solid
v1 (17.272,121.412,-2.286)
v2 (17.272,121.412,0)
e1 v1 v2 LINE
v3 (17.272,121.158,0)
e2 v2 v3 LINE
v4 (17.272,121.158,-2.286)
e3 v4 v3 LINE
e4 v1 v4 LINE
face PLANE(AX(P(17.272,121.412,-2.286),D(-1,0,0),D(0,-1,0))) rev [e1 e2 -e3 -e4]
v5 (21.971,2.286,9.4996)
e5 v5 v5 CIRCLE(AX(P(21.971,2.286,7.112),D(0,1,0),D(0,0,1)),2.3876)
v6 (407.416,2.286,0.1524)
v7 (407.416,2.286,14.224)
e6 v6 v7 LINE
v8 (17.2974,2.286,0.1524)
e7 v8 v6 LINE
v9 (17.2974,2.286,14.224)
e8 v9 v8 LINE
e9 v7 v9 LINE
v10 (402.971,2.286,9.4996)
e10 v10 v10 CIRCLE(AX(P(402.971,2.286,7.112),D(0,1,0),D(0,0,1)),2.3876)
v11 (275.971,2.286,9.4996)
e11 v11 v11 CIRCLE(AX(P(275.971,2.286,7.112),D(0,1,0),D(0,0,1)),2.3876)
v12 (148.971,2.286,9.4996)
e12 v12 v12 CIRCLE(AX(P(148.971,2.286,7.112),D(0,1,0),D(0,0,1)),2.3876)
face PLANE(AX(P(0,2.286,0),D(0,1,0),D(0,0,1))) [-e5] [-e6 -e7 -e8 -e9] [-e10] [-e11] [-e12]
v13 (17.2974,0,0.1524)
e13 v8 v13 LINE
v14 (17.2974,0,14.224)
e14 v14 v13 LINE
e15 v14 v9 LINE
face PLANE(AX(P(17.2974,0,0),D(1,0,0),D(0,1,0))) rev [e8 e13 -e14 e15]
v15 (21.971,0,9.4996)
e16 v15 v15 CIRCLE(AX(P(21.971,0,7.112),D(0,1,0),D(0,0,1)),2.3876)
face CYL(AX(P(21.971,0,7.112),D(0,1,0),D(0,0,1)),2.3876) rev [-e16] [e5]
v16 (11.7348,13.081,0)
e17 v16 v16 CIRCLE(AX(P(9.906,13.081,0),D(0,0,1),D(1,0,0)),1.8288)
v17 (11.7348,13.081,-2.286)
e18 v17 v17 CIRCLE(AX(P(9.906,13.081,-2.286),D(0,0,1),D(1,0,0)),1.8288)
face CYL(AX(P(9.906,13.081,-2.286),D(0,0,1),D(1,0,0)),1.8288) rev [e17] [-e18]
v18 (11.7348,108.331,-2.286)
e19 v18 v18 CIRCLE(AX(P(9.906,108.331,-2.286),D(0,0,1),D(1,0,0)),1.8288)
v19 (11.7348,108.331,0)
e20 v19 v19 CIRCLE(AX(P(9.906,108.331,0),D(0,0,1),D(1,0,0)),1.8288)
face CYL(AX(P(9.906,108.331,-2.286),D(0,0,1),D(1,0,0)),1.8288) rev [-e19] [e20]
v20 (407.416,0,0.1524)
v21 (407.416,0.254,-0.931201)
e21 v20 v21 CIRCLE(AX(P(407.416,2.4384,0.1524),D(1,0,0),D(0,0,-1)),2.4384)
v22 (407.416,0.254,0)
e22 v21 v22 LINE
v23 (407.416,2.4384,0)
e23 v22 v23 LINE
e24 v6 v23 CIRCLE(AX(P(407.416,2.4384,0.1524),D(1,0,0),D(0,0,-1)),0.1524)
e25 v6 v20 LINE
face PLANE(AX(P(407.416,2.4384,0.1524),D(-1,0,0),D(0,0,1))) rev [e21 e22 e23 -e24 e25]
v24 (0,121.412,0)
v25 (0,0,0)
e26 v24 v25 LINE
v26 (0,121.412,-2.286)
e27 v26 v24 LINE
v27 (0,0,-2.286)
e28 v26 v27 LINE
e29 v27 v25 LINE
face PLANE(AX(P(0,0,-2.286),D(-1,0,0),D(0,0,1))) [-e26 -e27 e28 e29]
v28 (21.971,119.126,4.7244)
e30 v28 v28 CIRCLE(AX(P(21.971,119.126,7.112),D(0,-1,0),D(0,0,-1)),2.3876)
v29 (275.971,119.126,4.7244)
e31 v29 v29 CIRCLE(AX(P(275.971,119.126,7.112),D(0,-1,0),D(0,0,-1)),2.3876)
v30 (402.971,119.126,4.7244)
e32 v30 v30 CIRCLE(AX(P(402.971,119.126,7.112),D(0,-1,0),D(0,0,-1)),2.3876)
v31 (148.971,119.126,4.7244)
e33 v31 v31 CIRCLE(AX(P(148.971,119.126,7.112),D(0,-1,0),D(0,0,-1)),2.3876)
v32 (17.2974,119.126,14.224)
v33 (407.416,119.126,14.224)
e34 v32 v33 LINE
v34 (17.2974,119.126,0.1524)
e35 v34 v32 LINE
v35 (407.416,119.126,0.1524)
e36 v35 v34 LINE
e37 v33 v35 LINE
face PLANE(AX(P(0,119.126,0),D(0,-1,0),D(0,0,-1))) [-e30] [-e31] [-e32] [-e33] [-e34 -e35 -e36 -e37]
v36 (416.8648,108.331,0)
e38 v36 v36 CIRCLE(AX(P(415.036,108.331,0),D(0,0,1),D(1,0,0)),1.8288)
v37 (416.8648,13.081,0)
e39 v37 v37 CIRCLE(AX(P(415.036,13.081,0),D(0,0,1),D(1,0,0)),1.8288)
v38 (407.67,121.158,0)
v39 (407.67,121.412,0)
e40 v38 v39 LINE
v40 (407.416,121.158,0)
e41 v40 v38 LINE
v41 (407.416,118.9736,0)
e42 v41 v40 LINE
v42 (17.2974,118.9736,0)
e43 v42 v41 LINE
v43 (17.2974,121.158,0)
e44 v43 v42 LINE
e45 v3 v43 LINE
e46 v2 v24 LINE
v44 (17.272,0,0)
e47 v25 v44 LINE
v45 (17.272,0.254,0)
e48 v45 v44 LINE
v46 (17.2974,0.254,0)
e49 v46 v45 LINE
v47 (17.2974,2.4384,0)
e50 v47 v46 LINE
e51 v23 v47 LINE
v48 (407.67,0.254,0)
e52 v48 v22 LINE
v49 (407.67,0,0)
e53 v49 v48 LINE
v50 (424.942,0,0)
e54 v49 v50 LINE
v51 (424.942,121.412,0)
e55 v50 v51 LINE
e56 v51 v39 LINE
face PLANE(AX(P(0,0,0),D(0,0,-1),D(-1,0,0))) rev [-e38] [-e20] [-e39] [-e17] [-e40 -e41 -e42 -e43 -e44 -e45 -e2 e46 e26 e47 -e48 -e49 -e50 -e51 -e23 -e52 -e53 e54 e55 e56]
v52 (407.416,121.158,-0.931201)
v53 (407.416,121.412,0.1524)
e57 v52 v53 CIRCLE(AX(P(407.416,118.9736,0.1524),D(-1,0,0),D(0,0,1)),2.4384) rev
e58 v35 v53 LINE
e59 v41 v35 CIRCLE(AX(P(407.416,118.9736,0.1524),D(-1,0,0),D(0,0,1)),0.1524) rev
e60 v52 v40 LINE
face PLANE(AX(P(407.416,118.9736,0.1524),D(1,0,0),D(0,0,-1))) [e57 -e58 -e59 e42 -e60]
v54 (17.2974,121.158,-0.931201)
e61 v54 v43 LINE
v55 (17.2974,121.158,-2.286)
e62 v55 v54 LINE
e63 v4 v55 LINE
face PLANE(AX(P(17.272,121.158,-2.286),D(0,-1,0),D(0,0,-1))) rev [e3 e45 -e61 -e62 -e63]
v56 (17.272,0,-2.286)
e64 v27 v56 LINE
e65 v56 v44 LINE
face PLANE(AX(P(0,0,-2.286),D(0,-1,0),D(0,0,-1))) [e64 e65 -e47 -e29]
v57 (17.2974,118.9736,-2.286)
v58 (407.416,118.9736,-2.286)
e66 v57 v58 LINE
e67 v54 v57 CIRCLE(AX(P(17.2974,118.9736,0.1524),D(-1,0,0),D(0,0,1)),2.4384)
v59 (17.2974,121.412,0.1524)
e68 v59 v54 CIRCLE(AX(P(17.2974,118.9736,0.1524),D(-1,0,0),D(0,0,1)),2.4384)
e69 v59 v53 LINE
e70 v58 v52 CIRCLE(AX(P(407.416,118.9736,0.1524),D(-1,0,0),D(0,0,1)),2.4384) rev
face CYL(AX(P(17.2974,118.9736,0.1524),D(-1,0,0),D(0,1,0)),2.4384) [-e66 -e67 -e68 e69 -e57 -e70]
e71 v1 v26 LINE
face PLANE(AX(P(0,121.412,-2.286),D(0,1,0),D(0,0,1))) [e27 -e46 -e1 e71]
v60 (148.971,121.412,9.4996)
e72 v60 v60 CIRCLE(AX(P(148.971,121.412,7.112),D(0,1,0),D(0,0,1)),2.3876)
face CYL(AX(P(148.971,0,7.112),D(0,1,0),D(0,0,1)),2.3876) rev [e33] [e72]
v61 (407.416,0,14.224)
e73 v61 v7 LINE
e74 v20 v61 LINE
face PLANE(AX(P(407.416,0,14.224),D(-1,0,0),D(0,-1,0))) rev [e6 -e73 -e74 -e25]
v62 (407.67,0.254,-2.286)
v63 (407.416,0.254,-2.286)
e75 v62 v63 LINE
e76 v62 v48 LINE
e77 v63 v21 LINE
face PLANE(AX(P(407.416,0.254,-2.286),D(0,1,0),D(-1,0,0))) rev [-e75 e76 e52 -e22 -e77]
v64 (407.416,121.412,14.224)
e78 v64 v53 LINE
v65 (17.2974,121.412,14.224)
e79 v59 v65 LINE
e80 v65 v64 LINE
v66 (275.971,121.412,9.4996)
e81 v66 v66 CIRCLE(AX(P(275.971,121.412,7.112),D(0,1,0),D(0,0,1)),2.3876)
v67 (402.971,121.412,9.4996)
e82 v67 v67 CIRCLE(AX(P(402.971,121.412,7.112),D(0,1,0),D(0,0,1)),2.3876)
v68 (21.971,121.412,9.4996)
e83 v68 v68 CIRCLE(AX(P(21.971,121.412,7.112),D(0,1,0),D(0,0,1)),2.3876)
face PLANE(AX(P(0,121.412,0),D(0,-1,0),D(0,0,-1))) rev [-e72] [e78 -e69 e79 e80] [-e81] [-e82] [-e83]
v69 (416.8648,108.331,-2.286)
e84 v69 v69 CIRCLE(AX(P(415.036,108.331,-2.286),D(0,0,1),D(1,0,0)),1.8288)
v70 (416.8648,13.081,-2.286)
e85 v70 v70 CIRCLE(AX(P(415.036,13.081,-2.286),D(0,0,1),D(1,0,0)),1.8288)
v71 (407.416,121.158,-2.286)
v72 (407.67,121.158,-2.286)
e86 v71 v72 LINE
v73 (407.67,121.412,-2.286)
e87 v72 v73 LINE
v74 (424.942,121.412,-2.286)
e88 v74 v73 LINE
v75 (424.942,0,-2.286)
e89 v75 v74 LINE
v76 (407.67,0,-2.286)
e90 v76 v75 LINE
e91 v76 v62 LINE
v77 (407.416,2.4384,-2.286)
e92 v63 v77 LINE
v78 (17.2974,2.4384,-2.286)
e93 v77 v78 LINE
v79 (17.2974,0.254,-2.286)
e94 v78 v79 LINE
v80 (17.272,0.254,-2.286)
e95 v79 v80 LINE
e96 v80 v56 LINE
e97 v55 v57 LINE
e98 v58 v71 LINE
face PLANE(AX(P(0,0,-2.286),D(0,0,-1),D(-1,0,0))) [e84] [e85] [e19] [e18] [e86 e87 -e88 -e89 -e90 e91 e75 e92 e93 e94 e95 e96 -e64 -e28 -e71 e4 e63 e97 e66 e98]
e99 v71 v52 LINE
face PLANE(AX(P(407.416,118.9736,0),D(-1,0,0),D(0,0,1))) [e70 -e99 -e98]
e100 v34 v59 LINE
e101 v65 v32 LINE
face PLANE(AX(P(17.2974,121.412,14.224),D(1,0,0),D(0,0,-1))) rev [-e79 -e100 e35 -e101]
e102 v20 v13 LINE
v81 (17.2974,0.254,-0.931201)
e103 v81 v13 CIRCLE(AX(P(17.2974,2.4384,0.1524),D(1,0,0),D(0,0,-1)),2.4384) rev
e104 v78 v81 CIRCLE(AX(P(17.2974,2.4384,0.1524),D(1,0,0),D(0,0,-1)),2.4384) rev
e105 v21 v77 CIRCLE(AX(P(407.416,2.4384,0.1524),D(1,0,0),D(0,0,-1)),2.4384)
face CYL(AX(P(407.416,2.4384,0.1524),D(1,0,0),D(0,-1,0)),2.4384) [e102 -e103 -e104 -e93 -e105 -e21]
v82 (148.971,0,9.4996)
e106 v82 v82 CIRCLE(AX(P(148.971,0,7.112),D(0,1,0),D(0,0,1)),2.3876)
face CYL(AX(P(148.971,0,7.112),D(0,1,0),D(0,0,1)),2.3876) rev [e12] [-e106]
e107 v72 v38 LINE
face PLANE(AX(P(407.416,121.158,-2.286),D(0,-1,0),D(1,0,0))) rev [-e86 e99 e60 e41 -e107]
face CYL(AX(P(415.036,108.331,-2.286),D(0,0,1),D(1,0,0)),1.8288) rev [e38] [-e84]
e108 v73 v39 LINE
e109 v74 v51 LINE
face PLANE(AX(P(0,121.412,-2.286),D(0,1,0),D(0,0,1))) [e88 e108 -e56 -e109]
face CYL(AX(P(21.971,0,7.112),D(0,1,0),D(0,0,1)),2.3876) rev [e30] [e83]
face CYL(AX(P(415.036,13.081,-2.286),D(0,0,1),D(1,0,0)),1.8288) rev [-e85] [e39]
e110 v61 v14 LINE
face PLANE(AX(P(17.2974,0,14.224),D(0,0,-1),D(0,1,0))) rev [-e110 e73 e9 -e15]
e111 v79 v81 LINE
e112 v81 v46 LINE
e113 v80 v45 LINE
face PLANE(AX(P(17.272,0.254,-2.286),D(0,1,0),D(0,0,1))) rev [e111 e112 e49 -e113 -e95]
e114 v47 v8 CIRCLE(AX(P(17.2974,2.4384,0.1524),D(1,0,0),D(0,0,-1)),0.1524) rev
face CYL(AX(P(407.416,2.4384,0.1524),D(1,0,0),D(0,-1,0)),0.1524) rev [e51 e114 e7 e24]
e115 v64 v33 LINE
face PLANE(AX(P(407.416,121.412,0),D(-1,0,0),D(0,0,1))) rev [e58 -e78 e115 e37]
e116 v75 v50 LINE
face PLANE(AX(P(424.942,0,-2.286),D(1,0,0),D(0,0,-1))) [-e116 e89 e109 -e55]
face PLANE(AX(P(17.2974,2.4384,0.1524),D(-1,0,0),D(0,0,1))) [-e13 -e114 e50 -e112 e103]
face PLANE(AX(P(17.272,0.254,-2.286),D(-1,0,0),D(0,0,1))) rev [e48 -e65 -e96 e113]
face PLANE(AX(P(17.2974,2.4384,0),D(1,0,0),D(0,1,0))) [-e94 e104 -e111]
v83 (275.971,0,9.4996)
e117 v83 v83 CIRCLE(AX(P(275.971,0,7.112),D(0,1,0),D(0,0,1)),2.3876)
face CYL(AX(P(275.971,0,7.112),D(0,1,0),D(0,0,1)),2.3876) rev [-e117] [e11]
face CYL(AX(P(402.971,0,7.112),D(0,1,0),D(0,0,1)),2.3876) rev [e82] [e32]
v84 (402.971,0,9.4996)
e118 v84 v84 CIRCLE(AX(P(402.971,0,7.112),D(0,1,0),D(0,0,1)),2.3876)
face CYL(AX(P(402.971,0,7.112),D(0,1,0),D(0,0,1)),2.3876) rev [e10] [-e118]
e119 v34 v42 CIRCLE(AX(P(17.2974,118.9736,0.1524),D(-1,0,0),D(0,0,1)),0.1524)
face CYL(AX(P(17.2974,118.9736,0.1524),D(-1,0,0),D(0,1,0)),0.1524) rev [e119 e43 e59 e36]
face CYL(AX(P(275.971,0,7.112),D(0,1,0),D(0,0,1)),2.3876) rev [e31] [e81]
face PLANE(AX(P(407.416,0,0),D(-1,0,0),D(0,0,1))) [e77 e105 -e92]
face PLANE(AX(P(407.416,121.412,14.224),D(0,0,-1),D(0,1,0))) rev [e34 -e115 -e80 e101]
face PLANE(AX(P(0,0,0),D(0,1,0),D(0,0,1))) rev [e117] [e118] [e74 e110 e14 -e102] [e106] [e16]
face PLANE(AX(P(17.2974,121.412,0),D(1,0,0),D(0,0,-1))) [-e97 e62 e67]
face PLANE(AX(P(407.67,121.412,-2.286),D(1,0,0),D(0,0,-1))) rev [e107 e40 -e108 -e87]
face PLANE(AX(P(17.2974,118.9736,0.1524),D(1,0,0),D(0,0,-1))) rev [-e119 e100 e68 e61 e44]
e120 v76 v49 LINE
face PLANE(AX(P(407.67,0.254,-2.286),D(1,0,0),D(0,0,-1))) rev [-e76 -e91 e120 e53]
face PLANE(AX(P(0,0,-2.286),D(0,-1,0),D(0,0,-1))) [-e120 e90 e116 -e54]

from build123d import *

# Parameters (mm, degrees)
SKETCH1_W                      = 424.942
SKETCH1_H                      = 121.412
SKETCH1_R                      = 1.8288
BASE_FLANGE1_DEPTH             = 2.286
SKETCH4_W                      = 0.0254
SKETCH4_H                      = 0.254
SKETCH4_W_2                    = 0.254
CUT_EXTRUDE1_DEPTH             = 2.286
EDGE_FLANGE1_STRIP_W           = 9.4488
EDGE_FLANGE1_STRIP_H           = 2.286
EDGE_FLANGE1_STRIP_CUT_DEPTH   = 390.1186
EDGE_FLANGE1_STRIP_2_W         = 9.4488
EDGE_FLANGE1_STRIP_2_H         = 2.286
EDGE_FLANGE1_STRIP_CUT_2_DEPTH = 390.1186
EDGE_FLANGE1_DEPTH             = 390.1186
EDGE_FLANGE1_BEND_DEPTH        = 390.1186
SKETCH10_R                     = 2.3876
CUT_EXTRUDE2_DEPTH             = 443.175190715


# Sheet-metal steps are written as plain solids
with BuildPart() as part:
    # Sketch1 → Base-Flange1 (new body)
    with BuildSketch(Plane.XY):
        with Locations((212.471, 60.706)):
            Rectangle(SKETCH1_W, SKETCH1_H)
        with Locations((9.906, 13.081)):
            Circle(SKETCH1_R, mode=Mode.SUBTRACT)
        with Locations((415.036, 13.081)):
            Circle(SKETCH1_R, mode=Mode.SUBTRACT)
        with Locations((9.906, 108.331)):
            Circle(SKETCH1_R, mode=Mode.SUBTRACT)
        with Locations((415.036, 108.331)):
            Circle(SKETCH1_R, mode=Mode.SUBTRACT)
    extrude(amount=-BASE_FLANGE1_DEPTH)

    # Sketch4 → Cut-Extrude1 (cut)
    with BuildSketch(Plane.XY):
        with Locations((17.2847, 121.285)):
            Rectangle(SKETCH4_W, SKETCH4_H)
        with Locations((407.543, 121.285)):
            Rectangle(SKETCH4_W_2, SKETCH4_H)
        with Locations((407.543, 0.127)):
            Rectangle(SKETCH4_W_2, SKETCH4_H)
        with Locations((17.2847, 0.127)):
            Rectangle(SKETCH4_W, SKETCH4_H)
    extrude(amount=-CUT_EXTRUDE1_DEPTH, mode=Mode.SUBTRACT)

    # Edge-Flange1 strip (across the edge) → Edge-Flange1 strip cut (cut)
    with BuildSketch(Plane(origin=(407.416, 121.412, 0), x_dir=(0, -1, 0), z_dir=(-1, 0, 0))):
        with Locations((-2.286, -1.143)):
            Rectangle(EDGE_FLANGE1_STRIP_W, EDGE_FLANGE1_STRIP_H)
    extrude(amount=EDGE_FLANGE1_STRIP_CUT_DEPTH, mode=Mode.SUBTRACT)

    # Edge-Flange1 strip 2 (across the edge) → Edge-Flange1 strip cut 2 (cut)
    with BuildSketch(Plane.YZ.offset(17.2974)):
        with Locations((-2.286, -1.143)):
            Rectangle(EDGE_FLANGE1_STRIP_2_W, EDGE_FLANGE1_STRIP_2_H)
    extrude(amount=EDGE_FLANGE1_STRIP_CUT_2_DEPTH, mode=Mode.SUBTRACT)

    # Edge-Flange1 section (across the edge) → Edge-Flange1 (add)
    with BuildSketch(Plane(origin=(407.416, 121.412, 0), x_dir=(0, -1, 0), z_dir=(-1, 0, 0))):
        with BuildLine():
            Line((0, 0.1524), (0, 14.224))
            Line((0, 14.224), (2.286, 14.224))
            Line((2.286, 14.224), (2.286, 0.1524))
            ThreePointArc((2.286, 0.1524), (2.330636927, 0.044636927), (2.4384, 0))
            Line((2.4384, 0), (2.4384, -2.286))
            ThreePointArc((2.4384, -2.286), (0.714190825, -1.571809175), (0, 0.1524))
        make_face()
    extrude(amount=EDGE_FLANGE1_DEPTH)

    # Edge-Flange1 section 2 (across the edge) → Edge-Flange1 bend (add)
    with BuildSketch(Plane.YZ.offset(17.2974)):
        with BuildLine():
            Line((0, 0.1524), (0, 14.224))
            Line((0, 14.224), (2.286, 14.224))
            Line((2.286, 14.224), (2.286, 0.1524))
            ThreePointArc((2.286, 0.1524), (2.330636927, 0.044636927), (2.4384, 0))
            Line((2.4384, 0), (2.4384, -2.286))
            ThreePointArc((2.4384, -2.286), (0.714190825, -1.571809175), (0, 0.1524))
        make_face()
    extrude(amount=EDGE_FLANGE1_BEND_DEPTH)

    # Sketch10 → Cut-Extrude2 (cut, through all)
    with BuildSketch(Plane(origin=(0, 121.412, 0), x_dir=(-1, 0, 0), z_dir=(0, 1, 0))):
        with Locations(Location((-402.971, 7.112, 0), (0, 0, 90))):
            Circle(SKETCH10_R)
        with Locations(Location((-275.971, 7.112, 0), (0, 0, 90))):
            Circle(SKETCH10_R)
        with Locations(Location((-148.971, 7.112, 0), (0, 0, 90))):
            Circle(SKETCH10_R)
        with Locations(Location((-21.971, 7.112, 0), (0, 0, 90))):
            Circle(SKETCH10_R)
    extrude(amount=-CUT_EXTRUDE2_DEPTH, mode=Mode.SUBTRACT)


solid = part.part
